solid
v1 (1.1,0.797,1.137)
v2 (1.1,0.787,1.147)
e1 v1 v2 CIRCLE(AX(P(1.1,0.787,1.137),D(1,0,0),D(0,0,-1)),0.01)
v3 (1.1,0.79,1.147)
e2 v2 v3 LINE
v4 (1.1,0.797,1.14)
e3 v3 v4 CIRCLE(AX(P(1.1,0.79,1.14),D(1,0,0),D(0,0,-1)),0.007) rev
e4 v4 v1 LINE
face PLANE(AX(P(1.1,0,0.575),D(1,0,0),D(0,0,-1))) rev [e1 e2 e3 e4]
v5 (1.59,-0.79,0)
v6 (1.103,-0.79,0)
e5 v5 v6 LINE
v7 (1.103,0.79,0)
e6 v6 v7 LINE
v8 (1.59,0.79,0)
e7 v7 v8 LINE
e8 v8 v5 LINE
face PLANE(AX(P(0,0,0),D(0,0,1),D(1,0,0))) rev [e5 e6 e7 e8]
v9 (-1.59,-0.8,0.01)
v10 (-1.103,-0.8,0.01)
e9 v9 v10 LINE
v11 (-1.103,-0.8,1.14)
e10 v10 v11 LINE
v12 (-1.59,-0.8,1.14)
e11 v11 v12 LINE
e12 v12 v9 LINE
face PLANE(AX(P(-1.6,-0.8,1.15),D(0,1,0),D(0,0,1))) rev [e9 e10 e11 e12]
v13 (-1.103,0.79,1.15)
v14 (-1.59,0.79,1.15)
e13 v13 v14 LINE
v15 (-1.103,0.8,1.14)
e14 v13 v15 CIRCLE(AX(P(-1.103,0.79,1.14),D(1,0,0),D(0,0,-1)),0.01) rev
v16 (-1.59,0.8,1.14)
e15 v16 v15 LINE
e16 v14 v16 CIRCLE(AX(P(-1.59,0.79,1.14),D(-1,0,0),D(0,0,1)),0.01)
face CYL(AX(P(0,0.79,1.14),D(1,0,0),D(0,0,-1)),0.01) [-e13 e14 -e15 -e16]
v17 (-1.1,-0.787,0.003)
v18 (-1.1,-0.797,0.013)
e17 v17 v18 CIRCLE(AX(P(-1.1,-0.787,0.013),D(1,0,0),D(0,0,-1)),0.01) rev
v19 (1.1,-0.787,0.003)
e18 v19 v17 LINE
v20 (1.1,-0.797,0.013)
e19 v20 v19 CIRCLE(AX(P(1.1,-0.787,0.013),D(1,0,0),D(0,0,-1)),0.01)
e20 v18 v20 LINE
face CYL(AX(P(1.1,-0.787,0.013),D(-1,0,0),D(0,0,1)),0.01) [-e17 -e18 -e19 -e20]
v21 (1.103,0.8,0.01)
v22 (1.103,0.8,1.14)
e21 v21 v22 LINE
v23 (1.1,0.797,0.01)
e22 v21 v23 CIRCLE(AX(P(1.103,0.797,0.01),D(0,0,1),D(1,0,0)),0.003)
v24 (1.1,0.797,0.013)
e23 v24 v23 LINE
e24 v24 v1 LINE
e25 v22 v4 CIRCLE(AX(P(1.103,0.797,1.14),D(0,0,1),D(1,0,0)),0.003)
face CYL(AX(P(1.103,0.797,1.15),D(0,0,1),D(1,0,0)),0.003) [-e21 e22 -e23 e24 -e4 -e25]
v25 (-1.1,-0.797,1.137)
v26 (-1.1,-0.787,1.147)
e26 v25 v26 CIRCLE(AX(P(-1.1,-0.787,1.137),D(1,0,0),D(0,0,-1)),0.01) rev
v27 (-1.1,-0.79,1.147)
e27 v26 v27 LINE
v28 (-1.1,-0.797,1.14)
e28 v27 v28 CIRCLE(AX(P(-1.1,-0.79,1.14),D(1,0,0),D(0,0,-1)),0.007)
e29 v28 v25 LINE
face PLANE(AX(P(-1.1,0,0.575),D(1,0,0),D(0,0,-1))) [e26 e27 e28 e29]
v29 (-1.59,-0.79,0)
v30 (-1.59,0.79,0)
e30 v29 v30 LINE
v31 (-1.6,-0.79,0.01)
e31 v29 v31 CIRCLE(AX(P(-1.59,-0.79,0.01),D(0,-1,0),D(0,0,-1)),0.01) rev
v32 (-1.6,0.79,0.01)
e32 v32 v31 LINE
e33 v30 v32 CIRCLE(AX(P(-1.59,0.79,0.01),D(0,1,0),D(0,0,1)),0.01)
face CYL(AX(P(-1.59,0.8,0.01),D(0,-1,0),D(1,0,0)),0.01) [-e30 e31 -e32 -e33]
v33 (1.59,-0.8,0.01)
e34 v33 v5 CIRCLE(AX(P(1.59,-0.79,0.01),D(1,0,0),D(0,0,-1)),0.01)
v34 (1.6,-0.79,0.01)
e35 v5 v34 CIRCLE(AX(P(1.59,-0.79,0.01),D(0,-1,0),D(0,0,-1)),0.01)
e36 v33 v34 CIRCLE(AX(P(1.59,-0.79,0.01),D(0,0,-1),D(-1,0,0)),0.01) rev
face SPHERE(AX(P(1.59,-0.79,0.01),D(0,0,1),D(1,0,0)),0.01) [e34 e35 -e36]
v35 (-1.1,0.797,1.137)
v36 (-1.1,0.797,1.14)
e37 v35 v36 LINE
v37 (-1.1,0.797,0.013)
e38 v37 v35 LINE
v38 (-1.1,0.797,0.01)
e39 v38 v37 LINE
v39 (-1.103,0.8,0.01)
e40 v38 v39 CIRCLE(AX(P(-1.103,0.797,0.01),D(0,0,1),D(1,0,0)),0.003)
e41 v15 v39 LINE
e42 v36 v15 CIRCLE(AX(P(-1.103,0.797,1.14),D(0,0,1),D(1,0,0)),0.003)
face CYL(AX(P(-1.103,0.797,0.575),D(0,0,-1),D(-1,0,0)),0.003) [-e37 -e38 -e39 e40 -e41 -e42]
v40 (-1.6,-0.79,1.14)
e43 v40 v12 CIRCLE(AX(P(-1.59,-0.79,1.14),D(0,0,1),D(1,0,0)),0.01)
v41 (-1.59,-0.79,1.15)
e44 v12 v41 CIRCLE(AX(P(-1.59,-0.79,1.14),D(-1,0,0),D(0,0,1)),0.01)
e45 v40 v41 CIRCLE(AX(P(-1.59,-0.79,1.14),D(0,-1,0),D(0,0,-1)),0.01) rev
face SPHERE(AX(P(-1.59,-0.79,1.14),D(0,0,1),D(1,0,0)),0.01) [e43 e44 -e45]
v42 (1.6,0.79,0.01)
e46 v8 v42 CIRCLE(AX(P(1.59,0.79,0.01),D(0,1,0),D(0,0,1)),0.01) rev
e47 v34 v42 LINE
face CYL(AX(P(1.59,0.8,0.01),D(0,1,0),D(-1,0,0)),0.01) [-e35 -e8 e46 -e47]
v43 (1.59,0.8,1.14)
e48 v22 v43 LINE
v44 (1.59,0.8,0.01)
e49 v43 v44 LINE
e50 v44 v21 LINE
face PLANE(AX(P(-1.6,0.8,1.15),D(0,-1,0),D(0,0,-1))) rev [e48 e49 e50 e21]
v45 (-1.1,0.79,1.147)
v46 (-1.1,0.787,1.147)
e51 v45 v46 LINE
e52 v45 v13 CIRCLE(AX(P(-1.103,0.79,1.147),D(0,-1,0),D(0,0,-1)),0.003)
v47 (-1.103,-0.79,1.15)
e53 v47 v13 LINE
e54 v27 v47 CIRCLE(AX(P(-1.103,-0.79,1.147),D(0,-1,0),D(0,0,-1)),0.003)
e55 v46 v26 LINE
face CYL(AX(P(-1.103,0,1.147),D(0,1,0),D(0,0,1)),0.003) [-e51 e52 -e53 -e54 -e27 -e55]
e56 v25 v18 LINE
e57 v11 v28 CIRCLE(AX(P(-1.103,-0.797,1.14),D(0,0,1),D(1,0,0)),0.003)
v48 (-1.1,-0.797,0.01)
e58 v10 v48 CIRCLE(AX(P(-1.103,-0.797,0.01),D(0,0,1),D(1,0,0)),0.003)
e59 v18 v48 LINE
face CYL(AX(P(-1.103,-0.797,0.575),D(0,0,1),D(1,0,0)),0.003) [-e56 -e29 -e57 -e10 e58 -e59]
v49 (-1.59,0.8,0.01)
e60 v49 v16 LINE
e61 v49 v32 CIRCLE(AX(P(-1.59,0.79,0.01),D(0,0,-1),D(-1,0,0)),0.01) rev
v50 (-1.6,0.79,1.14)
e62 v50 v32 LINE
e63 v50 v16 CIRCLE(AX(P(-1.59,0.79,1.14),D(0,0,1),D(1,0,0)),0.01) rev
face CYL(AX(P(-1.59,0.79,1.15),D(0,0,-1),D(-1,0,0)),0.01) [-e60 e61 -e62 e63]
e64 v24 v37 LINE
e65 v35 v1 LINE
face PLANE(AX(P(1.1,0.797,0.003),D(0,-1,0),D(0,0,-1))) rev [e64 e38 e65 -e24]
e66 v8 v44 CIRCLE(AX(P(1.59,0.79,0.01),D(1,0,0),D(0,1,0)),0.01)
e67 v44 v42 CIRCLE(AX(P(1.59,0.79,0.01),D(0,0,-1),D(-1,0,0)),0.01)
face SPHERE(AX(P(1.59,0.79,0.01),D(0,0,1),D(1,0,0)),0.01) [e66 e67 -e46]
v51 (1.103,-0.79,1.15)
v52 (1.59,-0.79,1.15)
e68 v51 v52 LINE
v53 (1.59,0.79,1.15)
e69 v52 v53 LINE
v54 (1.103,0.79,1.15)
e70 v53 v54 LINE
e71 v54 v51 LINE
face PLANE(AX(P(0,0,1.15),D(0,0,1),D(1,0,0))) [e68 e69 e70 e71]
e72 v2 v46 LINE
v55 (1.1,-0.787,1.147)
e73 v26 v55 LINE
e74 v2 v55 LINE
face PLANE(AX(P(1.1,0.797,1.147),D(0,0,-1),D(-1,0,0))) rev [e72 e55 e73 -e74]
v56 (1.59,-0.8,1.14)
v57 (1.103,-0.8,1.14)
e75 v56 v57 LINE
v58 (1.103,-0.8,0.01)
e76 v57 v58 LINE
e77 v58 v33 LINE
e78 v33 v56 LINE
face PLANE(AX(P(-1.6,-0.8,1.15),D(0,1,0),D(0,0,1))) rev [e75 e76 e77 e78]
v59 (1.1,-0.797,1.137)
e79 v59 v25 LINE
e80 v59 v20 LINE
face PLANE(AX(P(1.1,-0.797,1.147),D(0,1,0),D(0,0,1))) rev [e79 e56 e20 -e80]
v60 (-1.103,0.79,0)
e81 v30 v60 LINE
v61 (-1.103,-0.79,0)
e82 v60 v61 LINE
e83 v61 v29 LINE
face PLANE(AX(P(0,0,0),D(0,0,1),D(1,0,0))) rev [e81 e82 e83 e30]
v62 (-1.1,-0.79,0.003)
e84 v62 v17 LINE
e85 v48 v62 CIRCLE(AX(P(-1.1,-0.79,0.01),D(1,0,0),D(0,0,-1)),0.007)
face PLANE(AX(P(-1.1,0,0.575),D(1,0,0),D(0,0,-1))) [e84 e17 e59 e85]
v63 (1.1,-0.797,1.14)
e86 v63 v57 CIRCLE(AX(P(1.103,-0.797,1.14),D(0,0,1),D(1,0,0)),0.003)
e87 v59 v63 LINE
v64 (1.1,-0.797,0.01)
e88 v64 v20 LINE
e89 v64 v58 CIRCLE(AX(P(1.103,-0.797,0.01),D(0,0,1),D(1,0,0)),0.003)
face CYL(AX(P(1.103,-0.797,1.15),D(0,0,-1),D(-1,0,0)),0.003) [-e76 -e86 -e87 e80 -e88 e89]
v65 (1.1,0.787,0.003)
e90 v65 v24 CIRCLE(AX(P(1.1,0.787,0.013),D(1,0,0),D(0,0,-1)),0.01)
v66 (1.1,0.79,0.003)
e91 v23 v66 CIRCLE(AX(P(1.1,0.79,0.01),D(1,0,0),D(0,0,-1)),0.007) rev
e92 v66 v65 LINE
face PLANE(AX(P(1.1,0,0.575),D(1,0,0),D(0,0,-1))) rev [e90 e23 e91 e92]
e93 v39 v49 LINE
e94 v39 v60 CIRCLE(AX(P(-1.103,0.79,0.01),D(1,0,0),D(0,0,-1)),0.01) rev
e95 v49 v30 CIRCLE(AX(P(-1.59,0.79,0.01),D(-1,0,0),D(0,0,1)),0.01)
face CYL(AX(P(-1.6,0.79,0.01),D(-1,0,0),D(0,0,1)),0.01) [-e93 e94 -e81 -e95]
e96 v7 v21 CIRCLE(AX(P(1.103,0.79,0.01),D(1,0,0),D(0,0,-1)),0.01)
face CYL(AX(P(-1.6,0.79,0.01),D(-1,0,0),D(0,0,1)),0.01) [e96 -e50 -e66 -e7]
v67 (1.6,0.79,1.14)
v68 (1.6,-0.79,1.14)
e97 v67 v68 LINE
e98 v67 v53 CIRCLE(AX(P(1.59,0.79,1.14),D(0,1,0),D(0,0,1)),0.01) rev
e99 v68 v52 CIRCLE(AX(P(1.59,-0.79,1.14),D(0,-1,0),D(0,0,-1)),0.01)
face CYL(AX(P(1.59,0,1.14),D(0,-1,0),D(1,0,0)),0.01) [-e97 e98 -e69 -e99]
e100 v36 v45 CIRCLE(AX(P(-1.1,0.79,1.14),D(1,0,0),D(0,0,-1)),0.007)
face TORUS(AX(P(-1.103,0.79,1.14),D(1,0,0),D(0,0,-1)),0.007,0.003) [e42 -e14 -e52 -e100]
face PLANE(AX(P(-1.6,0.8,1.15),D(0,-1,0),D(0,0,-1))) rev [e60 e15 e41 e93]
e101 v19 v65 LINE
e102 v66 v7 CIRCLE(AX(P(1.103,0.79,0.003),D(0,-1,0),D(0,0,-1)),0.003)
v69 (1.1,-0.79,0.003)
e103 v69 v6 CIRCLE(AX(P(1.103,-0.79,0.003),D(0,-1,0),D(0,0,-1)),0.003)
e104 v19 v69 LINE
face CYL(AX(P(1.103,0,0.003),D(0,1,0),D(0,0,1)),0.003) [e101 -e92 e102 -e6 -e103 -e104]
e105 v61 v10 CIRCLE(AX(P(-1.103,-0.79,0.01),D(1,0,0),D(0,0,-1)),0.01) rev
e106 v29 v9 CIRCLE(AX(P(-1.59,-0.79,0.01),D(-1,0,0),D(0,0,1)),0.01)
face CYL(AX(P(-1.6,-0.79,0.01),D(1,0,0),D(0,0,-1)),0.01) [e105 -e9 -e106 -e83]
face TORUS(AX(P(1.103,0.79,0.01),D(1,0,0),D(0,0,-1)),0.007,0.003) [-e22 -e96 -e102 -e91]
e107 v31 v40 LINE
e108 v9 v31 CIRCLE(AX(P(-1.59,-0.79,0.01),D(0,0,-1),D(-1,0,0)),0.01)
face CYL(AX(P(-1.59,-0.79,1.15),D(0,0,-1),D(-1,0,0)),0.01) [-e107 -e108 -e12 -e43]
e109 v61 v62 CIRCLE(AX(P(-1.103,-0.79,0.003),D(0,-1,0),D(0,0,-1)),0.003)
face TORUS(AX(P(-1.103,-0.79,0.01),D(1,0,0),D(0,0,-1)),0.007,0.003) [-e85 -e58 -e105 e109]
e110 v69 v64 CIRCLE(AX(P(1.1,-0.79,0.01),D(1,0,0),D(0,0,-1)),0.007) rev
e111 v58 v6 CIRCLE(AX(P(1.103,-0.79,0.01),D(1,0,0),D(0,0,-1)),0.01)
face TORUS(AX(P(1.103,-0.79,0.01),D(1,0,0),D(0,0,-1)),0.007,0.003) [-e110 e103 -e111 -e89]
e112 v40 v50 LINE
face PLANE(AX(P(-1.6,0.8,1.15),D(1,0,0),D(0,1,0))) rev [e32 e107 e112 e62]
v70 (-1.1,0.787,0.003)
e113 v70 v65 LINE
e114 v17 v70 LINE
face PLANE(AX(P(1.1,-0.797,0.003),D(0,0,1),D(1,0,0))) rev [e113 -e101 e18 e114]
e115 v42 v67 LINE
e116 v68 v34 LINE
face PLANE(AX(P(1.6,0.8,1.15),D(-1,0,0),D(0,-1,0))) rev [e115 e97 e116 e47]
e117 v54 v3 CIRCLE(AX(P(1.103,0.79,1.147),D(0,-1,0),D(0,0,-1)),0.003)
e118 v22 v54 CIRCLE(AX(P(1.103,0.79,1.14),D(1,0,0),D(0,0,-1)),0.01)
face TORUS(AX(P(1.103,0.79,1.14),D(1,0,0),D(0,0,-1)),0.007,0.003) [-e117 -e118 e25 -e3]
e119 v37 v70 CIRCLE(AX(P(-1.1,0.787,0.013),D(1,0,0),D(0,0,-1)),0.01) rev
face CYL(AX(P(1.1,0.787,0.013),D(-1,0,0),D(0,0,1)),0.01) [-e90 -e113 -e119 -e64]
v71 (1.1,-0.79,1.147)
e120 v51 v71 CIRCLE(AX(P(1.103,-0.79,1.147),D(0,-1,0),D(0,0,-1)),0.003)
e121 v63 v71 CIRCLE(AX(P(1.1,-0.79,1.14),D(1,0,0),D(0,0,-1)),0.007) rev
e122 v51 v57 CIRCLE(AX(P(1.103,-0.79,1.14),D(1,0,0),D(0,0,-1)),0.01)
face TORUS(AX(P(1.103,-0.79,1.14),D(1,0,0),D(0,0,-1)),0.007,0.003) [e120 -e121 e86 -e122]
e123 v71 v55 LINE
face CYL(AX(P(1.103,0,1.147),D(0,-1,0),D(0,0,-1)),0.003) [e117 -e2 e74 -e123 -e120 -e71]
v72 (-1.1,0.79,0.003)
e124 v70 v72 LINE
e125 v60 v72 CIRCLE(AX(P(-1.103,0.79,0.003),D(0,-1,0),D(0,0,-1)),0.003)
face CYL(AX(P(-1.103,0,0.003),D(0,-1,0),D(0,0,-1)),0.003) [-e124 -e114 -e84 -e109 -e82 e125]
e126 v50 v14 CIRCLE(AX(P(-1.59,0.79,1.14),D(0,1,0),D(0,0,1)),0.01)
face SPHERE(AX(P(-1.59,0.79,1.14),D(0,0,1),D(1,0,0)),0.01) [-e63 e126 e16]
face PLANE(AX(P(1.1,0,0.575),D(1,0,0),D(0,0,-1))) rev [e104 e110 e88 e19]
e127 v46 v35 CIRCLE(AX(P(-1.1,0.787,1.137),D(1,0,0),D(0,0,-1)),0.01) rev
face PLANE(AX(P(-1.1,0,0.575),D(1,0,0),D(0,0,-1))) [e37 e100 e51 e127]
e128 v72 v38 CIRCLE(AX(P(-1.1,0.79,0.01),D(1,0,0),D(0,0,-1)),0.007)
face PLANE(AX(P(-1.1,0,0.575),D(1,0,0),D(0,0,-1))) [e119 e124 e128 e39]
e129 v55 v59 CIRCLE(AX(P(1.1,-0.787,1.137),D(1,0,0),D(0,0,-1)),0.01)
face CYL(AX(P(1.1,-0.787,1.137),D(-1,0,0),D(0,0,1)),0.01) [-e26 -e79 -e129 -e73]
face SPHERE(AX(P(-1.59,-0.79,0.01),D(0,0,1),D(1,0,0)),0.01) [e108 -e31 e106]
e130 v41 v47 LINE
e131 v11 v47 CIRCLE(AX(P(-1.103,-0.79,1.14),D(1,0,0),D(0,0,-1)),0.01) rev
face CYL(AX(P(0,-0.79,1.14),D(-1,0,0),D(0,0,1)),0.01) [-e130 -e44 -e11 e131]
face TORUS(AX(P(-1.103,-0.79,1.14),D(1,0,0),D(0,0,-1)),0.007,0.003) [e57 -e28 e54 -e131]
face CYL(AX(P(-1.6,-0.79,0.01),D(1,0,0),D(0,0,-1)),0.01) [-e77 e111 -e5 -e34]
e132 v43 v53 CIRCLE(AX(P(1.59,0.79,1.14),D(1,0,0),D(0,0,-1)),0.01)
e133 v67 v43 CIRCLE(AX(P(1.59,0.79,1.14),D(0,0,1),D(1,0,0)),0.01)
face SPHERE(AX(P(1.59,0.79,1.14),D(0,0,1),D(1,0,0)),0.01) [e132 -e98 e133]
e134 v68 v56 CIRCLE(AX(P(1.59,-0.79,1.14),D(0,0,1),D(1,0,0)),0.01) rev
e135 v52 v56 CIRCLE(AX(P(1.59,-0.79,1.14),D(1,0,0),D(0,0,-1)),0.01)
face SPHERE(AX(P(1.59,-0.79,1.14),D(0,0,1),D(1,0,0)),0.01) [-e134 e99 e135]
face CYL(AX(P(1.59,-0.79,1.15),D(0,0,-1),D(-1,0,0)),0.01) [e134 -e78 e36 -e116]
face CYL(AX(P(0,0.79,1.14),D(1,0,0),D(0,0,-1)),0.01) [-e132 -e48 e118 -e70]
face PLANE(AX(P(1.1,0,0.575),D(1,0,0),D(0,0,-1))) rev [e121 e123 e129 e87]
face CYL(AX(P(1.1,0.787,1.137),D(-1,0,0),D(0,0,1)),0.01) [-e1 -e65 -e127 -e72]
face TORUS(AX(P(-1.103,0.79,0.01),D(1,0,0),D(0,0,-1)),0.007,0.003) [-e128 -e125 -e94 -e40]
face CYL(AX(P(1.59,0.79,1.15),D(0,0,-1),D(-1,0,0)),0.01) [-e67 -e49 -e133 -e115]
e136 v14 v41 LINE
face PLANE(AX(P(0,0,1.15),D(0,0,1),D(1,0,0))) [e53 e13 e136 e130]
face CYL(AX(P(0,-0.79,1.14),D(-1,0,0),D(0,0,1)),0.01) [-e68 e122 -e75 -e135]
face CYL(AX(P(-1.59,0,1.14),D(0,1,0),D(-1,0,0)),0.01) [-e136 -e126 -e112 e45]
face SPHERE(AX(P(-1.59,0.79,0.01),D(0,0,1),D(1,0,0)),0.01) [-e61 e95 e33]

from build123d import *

# Parameters (mm, degrees)
SKETCH1_W                           = 3.2
SKETCH1_H                           = 1.6
ALL_BODY_DEPTH                      = 1.15
CUT_OUT_THE_BODY_FOR_PIN_DEPTH      = 1.1
CUT_OUT_THE_BODY_FOR_PIN_DEPTH_BACK = 1.1
SKETCH2_OUTSIDE_W                   = 3.902
SKETCH2_OUTSIDE_H                   = 4.352
SKETCH2_OUTSIDE_W_2                 = 1.144
SKETCH2_OUTSIDE_H_2                 = 1.594
BODY_FILLET_R                       = 0.01
PIN_FILLET_A_R                      = 0.01
PIN_FILLET_B_R                      = 0.003


with BuildPart() as part:
    # Sketch1 → All body (new body)
    with BuildSketch(Plane.XY):
        Rectangle(SKETCH1_W, SKETCH1_H)
    extrude(amount=ALL_BODY_DEPTH)

    # Sketch2 outside → Cut out the body for pin (cut, two sides: drawn at the far end of the back side and taken through both)
    with BuildSketch(Plane(origin=(0, 0, 0), x_dir=(0, 0, -1), z_dir=(1, 0, 0)).offset(-CUT_OUT_THE_BODY_FOR_PIN_DEPTH_BACK)):
        with Locations((-0.575, 0)):
            Rectangle(SKETCH2_OUTSIDE_W, SKETCH2_OUTSIDE_H)
        with Locations((-0.575, 0)):
            Rectangle(SKETCH2_OUTSIDE_W_2, SKETCH2_OUTSIDE_H_2, mode=Mode.SUBTRACT)
    extrude(amount=CUT_OUT_THE_BODY_FOR_PIN_DEPTH + CUT_OUT_THE_BODY_FOR_PIN_DEPTH_BACK, mode=Mode.SUBTRACT)

    # Body fillet
    body_fillet_edges = [part.edges().sort_by_distance(p)[0] for p in [
        (0, 0.797, 0.003),
        (0, 0.797, 1.147),
        (0, -0.797, 1.147),
        (0, -0.797, 0.003),
    ]]
    fillet(body_fillet_edges, radius=BODY_FILLET_R)

    # Pin fillet a
    pin_fillet_a_edges = [part.edges().sort_by_distance(p)[0] for p in [
        (1.6, 0, 1.15),
        (-1.35, 0.8, 0),
        (1.35, -0.8, 0),
        (1.35, -0.8, 1.15),
        (-1.35, 0.8, 1.15),
        (1.35, 0.8, 1.15),
        (-1.6, 0, 1.15),
        (1.35, 0.8, 0),
        (1.6, 0, 0),
        (-1.35, -0.8, 0),
        (-1.6, 0, 0),
        (-1.6, 0.8, 0.575),
        (1.6, 0.8, 0.575),
        (1.6, -0.8, 0.575),
        (-1.6, -0.8, 0.575),
        (-1.35, -0.8, 1.15),
    ]]
    fillet(pin_fillet_a_edges, radius=PIN_FILLET_A_R)

    # Pin fillet b
    pin_fillet_b_edges = [part.edges().sort_by_distance(p)[0] for p in [
        (1.1, -0.8, 0.575),
        (1.1, 0, 1.15),
        (1.1, 0.8, 0.575),
        (1.1, 0, 0),
        (-1.1, 0.8, 0.575),
        (-1.1, 0, 1.15),
        (-1.1, -0.8, 0.575),
        (-1.1, 0, 0),
        (1.1, 0.797071068, 0.002928932),
        (1.1, -0.797071068, 0.002928932),
        (1.1, -0.797071068, 1.147071068),
        (1.1, 0.797071068, 1.147071068),
        (-1.1, -0.797071068, 1.147071068),
        (-1.1, 0.797071068, 1.147071068),
        (-1.1, -0.797071068, 0.002928932),
        (-1.1, 0.797071068, 0.002928932),
    ]]
    fillet(pin_fillet_b_edges, radius=PIN_FILLET_B_R - 0.0001)  # a hair under: the kernel refuses the full size


solid = part.part
